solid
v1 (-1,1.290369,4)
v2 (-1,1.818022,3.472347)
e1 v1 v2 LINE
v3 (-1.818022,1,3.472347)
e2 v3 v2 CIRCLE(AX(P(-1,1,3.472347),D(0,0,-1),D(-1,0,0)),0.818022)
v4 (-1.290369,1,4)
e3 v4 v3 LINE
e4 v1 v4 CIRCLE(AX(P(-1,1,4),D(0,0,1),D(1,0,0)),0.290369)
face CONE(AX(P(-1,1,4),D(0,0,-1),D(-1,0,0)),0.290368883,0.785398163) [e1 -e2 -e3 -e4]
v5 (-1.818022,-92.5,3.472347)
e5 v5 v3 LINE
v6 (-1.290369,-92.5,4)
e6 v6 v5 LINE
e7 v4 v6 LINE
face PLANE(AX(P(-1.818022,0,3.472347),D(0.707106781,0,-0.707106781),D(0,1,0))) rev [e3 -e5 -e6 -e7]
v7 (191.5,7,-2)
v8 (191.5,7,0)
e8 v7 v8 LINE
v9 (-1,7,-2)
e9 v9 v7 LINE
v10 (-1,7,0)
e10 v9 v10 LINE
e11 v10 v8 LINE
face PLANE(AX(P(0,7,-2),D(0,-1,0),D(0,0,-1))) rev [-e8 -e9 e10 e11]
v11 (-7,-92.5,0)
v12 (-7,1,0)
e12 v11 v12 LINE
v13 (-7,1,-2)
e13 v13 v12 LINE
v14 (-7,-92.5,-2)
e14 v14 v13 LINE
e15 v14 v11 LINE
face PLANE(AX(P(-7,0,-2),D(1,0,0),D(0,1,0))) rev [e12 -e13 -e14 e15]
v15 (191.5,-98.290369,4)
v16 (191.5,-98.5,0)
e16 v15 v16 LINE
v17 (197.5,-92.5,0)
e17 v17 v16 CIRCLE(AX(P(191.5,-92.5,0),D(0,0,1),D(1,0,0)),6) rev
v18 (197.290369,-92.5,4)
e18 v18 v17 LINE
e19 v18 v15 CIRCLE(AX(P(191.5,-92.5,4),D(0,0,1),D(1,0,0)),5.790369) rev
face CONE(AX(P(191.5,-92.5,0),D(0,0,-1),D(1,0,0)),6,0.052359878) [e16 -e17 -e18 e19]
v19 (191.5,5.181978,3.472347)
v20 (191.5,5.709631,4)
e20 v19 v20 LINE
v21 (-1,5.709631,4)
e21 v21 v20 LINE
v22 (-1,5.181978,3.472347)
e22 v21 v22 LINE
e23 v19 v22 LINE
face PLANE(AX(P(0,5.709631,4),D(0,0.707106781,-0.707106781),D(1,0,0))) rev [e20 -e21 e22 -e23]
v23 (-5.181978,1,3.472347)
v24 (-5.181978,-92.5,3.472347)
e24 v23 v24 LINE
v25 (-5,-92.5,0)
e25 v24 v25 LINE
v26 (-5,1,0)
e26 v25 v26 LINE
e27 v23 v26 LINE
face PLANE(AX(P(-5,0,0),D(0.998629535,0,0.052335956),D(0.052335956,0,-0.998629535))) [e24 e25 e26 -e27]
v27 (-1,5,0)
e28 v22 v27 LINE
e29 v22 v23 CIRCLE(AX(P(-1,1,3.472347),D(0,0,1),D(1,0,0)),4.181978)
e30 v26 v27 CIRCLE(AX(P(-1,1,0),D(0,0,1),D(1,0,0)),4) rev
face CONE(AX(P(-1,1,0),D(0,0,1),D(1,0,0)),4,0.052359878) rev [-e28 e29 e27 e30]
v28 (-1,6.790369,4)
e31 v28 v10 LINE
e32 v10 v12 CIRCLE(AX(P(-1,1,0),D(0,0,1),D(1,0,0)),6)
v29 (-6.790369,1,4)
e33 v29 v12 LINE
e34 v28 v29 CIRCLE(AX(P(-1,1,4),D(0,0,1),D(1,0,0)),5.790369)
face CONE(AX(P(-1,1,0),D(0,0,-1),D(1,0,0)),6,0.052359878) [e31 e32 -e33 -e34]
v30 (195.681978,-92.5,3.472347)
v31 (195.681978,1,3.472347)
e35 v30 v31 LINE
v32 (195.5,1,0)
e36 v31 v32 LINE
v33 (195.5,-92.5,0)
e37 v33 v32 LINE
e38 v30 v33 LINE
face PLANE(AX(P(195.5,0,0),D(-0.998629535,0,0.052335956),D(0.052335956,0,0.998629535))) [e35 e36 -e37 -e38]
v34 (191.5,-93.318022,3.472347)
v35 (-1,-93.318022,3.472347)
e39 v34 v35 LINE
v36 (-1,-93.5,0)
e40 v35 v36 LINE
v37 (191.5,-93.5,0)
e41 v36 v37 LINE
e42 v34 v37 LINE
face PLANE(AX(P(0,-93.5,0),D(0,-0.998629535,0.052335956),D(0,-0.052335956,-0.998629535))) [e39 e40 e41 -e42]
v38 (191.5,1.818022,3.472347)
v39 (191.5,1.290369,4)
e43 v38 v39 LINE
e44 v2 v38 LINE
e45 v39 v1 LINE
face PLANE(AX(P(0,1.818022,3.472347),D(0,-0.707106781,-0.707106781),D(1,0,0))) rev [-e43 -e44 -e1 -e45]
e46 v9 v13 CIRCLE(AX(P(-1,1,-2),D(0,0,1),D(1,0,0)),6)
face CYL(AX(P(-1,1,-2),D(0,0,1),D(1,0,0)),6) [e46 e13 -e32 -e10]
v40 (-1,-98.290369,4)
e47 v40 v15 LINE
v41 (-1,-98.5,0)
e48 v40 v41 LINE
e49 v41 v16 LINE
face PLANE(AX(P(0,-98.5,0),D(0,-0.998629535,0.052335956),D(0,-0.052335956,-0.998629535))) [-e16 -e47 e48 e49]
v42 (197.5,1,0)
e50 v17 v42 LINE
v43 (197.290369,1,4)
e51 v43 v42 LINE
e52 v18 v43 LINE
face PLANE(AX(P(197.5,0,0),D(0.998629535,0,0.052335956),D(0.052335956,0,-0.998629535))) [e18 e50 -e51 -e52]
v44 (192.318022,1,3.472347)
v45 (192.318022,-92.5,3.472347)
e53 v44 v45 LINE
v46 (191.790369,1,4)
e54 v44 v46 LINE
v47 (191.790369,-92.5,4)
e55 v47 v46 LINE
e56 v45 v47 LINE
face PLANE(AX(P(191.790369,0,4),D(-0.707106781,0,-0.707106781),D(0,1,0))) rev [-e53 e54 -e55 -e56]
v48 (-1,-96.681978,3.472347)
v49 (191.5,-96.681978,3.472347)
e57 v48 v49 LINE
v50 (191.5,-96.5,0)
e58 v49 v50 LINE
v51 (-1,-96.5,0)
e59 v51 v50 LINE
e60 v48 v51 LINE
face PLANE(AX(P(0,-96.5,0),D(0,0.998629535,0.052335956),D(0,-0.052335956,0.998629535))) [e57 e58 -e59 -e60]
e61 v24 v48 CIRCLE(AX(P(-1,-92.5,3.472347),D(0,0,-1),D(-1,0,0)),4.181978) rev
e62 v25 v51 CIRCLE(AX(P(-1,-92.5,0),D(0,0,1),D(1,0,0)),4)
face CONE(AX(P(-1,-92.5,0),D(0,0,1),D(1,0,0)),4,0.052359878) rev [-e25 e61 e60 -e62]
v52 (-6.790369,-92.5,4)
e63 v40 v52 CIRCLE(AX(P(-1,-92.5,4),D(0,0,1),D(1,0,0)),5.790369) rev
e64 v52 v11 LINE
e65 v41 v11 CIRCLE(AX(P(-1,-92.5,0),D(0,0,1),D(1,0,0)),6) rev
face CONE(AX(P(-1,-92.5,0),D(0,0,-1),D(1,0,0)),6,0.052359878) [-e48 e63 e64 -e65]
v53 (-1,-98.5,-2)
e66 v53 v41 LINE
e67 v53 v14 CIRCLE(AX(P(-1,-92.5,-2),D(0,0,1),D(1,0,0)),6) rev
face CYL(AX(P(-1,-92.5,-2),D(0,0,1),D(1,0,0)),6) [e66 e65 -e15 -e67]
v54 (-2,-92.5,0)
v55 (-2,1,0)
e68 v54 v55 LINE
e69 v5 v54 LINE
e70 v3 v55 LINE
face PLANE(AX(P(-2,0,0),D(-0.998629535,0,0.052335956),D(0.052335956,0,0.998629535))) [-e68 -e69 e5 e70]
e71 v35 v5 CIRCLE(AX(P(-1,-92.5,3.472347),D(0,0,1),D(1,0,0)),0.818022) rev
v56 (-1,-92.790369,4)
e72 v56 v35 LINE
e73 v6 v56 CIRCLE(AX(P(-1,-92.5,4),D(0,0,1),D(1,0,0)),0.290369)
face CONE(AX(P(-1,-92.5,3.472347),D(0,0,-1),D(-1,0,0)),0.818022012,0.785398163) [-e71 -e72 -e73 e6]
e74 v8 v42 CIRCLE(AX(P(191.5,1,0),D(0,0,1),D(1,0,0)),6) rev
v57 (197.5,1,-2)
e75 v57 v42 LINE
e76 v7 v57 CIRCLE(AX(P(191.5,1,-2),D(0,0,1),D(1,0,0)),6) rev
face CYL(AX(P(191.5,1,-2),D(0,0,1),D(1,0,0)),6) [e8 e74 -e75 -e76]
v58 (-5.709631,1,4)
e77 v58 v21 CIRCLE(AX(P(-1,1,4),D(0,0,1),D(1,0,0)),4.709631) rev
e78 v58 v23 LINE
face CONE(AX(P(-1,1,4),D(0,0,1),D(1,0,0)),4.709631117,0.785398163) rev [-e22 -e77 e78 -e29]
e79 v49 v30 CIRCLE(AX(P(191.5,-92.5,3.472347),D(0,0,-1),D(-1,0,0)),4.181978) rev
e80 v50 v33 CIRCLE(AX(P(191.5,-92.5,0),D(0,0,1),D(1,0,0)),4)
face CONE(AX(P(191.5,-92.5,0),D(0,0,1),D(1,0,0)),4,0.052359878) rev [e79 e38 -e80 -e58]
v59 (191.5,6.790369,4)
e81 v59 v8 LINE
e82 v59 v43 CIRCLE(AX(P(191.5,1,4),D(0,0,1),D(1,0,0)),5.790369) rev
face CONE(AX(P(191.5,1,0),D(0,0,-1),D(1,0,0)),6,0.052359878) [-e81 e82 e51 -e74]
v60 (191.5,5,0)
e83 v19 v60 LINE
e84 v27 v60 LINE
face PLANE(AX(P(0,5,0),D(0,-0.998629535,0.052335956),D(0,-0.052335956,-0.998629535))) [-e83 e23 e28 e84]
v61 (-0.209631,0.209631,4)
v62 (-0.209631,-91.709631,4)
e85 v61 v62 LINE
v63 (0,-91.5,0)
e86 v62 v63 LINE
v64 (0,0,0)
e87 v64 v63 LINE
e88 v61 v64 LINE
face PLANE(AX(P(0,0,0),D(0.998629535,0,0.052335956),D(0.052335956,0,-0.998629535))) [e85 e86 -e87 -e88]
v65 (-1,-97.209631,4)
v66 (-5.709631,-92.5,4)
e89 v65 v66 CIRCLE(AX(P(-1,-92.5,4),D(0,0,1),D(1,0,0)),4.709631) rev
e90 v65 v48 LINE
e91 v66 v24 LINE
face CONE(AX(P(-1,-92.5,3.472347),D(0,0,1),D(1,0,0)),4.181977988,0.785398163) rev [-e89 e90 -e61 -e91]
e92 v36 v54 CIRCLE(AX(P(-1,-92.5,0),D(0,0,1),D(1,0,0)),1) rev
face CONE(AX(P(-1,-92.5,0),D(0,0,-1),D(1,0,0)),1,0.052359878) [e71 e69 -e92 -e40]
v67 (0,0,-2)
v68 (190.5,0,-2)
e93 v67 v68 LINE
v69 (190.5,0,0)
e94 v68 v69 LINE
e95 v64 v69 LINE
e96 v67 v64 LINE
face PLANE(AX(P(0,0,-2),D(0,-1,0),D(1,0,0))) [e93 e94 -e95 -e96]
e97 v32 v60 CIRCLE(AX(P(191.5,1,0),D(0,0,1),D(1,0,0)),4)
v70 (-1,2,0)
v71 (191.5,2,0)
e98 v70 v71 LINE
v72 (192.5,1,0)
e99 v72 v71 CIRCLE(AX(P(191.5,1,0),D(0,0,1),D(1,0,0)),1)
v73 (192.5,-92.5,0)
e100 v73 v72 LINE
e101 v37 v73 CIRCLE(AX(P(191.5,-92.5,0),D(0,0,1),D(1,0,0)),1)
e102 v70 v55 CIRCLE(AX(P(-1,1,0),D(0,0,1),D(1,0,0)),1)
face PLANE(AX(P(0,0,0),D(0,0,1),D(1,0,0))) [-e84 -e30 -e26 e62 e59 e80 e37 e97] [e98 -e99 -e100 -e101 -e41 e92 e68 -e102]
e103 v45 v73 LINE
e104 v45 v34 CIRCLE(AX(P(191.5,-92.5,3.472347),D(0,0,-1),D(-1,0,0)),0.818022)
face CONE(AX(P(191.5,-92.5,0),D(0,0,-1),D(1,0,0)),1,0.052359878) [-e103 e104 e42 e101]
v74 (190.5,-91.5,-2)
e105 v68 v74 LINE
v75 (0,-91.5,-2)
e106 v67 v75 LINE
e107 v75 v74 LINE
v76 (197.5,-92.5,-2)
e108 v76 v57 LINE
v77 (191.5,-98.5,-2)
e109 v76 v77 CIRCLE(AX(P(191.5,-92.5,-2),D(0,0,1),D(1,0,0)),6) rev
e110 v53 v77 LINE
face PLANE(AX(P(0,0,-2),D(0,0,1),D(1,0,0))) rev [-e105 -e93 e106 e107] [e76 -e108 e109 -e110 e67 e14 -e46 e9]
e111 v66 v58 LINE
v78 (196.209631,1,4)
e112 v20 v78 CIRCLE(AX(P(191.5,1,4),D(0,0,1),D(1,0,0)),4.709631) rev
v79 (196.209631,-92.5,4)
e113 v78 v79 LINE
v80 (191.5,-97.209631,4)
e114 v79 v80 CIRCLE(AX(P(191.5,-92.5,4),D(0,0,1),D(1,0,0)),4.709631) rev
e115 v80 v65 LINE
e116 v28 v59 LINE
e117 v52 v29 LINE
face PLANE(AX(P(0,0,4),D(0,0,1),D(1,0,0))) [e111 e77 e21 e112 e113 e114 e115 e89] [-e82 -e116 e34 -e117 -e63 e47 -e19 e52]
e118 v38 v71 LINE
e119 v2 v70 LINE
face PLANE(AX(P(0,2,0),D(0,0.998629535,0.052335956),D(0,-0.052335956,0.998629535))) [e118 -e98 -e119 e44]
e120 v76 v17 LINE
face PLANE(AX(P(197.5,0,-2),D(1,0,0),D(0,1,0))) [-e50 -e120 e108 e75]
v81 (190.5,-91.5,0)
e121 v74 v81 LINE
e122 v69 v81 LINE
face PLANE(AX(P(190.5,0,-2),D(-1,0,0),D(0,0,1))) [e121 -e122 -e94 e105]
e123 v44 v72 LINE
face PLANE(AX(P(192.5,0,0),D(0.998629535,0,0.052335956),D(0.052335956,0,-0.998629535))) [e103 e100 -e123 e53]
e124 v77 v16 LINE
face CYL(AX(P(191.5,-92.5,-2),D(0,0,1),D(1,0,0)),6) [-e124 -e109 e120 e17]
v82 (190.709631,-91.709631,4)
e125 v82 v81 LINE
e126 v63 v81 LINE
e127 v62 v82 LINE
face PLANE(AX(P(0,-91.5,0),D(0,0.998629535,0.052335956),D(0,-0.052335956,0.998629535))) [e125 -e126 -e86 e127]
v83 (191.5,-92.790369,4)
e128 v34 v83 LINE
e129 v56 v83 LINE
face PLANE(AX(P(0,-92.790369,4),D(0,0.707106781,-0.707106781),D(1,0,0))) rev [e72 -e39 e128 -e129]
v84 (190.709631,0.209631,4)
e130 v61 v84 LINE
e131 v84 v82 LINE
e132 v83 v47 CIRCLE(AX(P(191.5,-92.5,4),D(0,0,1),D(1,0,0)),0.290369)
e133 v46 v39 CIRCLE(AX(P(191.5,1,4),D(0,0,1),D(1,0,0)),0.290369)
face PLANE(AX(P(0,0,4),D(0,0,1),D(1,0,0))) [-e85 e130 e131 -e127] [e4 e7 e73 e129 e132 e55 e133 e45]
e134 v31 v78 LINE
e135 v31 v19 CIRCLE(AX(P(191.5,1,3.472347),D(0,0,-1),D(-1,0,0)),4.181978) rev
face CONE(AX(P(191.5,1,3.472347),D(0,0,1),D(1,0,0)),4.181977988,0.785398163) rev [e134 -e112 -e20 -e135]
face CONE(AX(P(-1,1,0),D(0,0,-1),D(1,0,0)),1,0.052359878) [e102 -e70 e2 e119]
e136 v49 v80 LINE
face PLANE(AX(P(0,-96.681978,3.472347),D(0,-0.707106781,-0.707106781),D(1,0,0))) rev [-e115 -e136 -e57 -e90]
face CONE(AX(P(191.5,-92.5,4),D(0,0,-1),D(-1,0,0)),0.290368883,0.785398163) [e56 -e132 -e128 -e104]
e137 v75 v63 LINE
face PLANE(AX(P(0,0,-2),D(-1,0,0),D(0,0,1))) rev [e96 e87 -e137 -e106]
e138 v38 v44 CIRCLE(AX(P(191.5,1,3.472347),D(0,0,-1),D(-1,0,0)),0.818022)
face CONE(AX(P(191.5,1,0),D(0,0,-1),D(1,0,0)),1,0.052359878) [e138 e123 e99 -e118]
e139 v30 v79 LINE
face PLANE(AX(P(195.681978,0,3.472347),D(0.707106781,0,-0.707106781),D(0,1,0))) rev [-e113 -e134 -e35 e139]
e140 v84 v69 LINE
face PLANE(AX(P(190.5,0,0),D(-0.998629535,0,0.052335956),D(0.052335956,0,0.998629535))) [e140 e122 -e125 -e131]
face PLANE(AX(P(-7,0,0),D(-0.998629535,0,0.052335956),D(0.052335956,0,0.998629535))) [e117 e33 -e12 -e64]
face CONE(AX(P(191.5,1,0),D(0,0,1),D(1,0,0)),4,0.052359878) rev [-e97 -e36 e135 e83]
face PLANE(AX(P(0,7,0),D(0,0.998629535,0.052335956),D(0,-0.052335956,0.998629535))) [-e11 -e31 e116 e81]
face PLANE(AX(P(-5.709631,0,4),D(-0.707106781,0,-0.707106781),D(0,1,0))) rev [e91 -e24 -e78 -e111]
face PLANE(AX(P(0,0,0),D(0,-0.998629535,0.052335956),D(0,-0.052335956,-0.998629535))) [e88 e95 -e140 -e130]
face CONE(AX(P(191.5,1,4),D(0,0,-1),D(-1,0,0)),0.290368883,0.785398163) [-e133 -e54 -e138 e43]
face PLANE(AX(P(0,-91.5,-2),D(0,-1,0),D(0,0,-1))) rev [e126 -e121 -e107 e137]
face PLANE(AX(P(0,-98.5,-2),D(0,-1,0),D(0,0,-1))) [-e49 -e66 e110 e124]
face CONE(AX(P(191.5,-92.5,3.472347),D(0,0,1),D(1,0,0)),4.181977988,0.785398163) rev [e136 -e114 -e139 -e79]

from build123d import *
from OCP.BRepFilletAPI import BRepFilletAPI_MakeChamfer

# Parameters (mm, degrees)
BOSS_EXTRU_1_DEPTH           = 4
BOSS_EXTRU_1_DRAFT           = 3
ESQUISSE1_W                  = 190.5
ESQUISSE1_H                  = 91.5
BOSS_EXTRU_1_PROFILE_2_DEPTH = 4
BOSS_EXTRU_1_PROFILE_2_DRAFT = 3
ESQUISSE1_4_W                = 190.5
ESQUISSE1_4_H                = 91.5
BOSS_EXTRU_2_DEPTH           = 2
CHANFREIN1_SIZE              = 0.528377251
CHANFREIN1_SIZE_2            = 0.5
CHANFREIN2_SIZE              = 0.528377251
CHANFREIN2_SIZE_2            = 0.5


with BuildPart() as part:
    # Esquisse1 → Boss.-Extru.1 (with draft: the straight prism first)
    with BuildSketch(Plane.XY):
        with BuildLine():
            Line((-1, -98.5), (191.5, -98.5))
            ThreePointArc((191.5, -98.5), (195.742640687, -96.742640687), (197.5, -92.5))
            Line((197.5, -92.5), (197.5, 1))
            ThreePointArc((197.5, 1), (195.742640687, 5.242640687), (191.5, 7))
            Line((191.5, 7), (-1, 7))
            ThreePointArc((-1, 7), (-5.242640687, 5.242640687), (-7, 1))
            Line((-7, 1), (-7, -92.5))
            ThreePointArc((-7, -92.5), (-5.242640687, -96.742640687), (-1, -98.5))
        make_face()
        with BuildLine():
            Line((-1, -96.5), (191.5, -96.5))
            ThreePointArc((191.5, -96.5), (194.328427125, -95.328427125), (195.5, -92.5))
            Line((195.5, -92.5), (195.5, 1))
            ThreePointArc((195.5, 1), (194.328427125, 3.828427125), (191.5, 5))
            Line((191.5, 5), (-1, 5))
            ThreePointArc((-1, 5), (-3.828427125, 3.828427125), (-5, 1))
            Line((-5, 1), (-5, -92.5))
            ThreePointArc((-5, -92.5), (-3.828427125, -95.328427125), (-1, -96.5))
        make_face(mode=Mode.SUBTRACT)
    extrude(amount=BOSS_EXTRU_1_DEPTH)
    # Boss.-Extru.1: the draft: its side faces are tilted about the plane it starts from
    boss_extru_1_sides = [part.faces().sort_by_distance(p)[0] for p in [
        (-5.242640687, -96.742640687, 2),
        (95.25, -98.5, 2),
        (195.742640687, -96.742640687, 2),
        (197.5, -45.75, 2),
        (195.742640687, 5.242640687, 2),
        (95.25, 7, 2),
        (-5.242640687, 5.242640687, 2),
        (-7, -45.75, 2),
        (-5, -45.75, 2),
        (-3.828427125, 3.828427125, 2),
        (95.25, 5, 2),
        (194.328427125, 3.828427125, 2),
        (195.5, -45.75, 2),
        (194.328427125, -95.328427125, 2),
        (95.25, -96.5, 2),
        (-3.828427125, -95.328427125, 2),
    ]]
    draft(boss_extru_1_sides, Plane.XY, BOSS_EXTRU_1_DRAFT)



with BuildPart() as body_2:
    # Esquisse1 → Boss.-Extru.1 profile 2 (with draft: the straight prism first)
    with BuildSketch(Plane.XY):
        with BuildLine():
            Line((-1, -93.5), (191.5, -93.5))
            ThreePointArc((191.5, -93.5), (192.207106781, -93.207106781), (192.5, -92.5))
            Line((192.5, -92.5), (192.5, 1))
            ThreePointArc((192.5, 1), (192.207106781, 1.707106781), (191.5, 2))
            Line((191.5, 2), (-1, 2))
            ThreePointArc((-1, 2), (-1.707106781, 1.707106781), (-2, 1))
            Line((-2, 1), (-2, -92.5))
            ThreePointArc((-2, -92.5), (-1.707106781, -93.207106781), (-1, -93.5))
        make_face()
        with Locations((95.25, -45.75)):
            Rectangle(ESQUISSE1_W, ESQUISSE1_H, mode=Mode.SUBTRACT)
    extrude(amount=BOSS_EXTRU_1_PROFILE_2_DEPTH)
    # Boss.-Extru.1 profile 2: the draft: its side faces are tilted about the plane it starts from
    boss_extru_1_profile_2_sides = [body_2.faces().sort_by_distance(p)[0] for p in [
        (-1.707106781, -93.207106781, 2),
        (95.25, -93.5, 2),
        (192.207106781, -93.207106781, 2),
        (192.5, -45.75, 2),
        (192.207106781, 1.707106781, 2),
        (95.25, 2, 2),
        (-1.707106781, 1.707106781, 2),
        (-2, -45.75, 2),
        (95.25, 0, 2),
        (190.5, -45.75, 2),
        (95.25, -91.5, 2),
        (0, -45.75, 2),
    ]]
    draft(boss_extru_1_profile_2_sides, Plane.XY, BOSS_EXTRU_1_PROFILE_2_DRAFT)


with BuildPart() as part_1:
    add(part.part)

    add(body_2.part)  # Boss.-Extru.2 merges body 2
    # Esquisse1<4> → Boss.-Extru.2 (add)
    with BuildSketch(Plane.XY):
        with BuildLine():
            Line((-1, -98.5), (191.5, -98.5))
            ThreePointArc((191.5, -98.5), (195.742640687, -96.742640687), (197.5, -92.5))
            Line((197.5, -92.5), (197.5, 1))
            ThreePointArc((197.5, 1), (195.742640687, 5.242640687), (191.5, 7))
            Line((191.5, 7), (-1, 7))
            ThreePointArc((-1, 7), (-5.242640687, 5.242640687), (-7, 1))
            Line((-7, 1), (-7, -92.5))
            ThreePointArc((-7, -92.5), (-5.242640687, -96.742640687), (-1, -98.5))
        make_face()
        with Locations((95.25, -45.75)):
            Rectangle(ESQUISSE1_4_W, ESQUISSE1_4_H, mode=Mode.SUBTRACT)
    extrude(amount=-BOSS_EXTRU_2_DEPTH)

    # Chanfrein1
    chanfrein1_edges_1 = [part_1.edges().sort_by_distance(p)[0] for p in [
        (-1.558875197, -93.058875197, 4),
    ]]
    chanfrein1_side_1 = [part_1.faces().sort_by_distance(p)[0] for p in [
        (-1.559245268, -93.059245268, 3.990013705),
    ]]
    chanfrein1_edges_2 = [part_1.edges().sort_by_distance(p)[0] for p in [
        (-1.790368883, -45.75, 4),
    ]]
    chanfrein1_side_2 = [part_1.faces().sort_by_distance(p)[0] for p in [
        (-1.790892242, -45.75, 3.990013705),
    ]]
    chanfrein1_edges_3 = [part_1.edges().sort_by_distance(p)[0] for p in [
        (95.25, -93.290368883, 4),
    ]]
    chanfrein1_side_3 = [part_1.faces().sort_by_distance(p)[0] for p in [
        (95.25, -93.290892242, 3.990013705),
    ]]
    chanfrein1_edges_4 = [part_1.edges().sort_by_distance(p)[0] for p in [
        (192.058875197, -93.058875197, 4),
    ]]
    chanfrein1_side_4 = [part_1.faces().sort_by_distance(p)[0] for p in [
        (192.051804129, -93.051804129, 4),
    ]]
    chanfrein1_edges_5 = [part_1.edges().sort_by_distance(p)[0] for p in [
        (192.290368883, -45.75, 4),
    ]]
    chanfrein1_side_5 = [part_1.faces().sort_by_distance(p)[0] for p in [
        (192.280368883, -45.75, 4),
    ]]
    chanfrein1_edges_6 = [part_1.edges().sort_by_distance(p)[0] for p in [
        (192.058875197, 1.558875197, 4),
    ]]
    chanfrein1_side_6 = [part_1.faces().sort_by_distance(p)[0] for p in [
        (192.051804129, 1.551804129, 4),
    ]]
    chanfrein1_edges_7 = [part_1.edges().sort_by_distance(p)[0] for p in [
        (95.25, 1.790368883, 4),
    ]]
    chanfrein1_side_7 = [part_1.faces().sort_by_distance(p)[0] for p in [
        (95.25, 1.780368883, 4),
    ]]
    chanfrein1_edges_8 = [part_1.edges().sort_by_distance(p)[0] for p in [
        (-1.558875197, 1.558875197, 4),
    ]]
    chanfrein1_side_8 = [part_1.faces().sort_by_distance(p)[0] for p in [
        (-1.551804129, 1.551804129, 4),
    ]]
    chanfrein1 = BRepFilletAPI_MakeChamfer(part_1.part.solid().wrapped)
    for e in chanfrein1_edges_1:
        chanfrein1.Add(CHANFREIN1_SIZE, CHANFREIN1_SIZE_2, e.wrapped, chanfrein1_side_1[0].wrapped)
    for e in chanfrein1_edges_2:
        chanfrein1.Add(CHANFREIN1_SIZE, CHANFREIN1_SIZE_2, e.wrapped, chanfrein1_side_2[0].wrapped)
    for e in chanfrein1_edges_3:
        chanfrein1.Add(CHANFREIN1_SIZE, CHANFREIN1_SIZE_2, e.wrapped, chanfrein1_side_3[0].wrapped)
    for e in chanfrein1_edges_4:
        chanfrein1.Add(CHANFREIN1_SIZE_2, CHANFREIN1_SIZE, e.wrapped, chanfrein1_side_4[0].wrapped)
    for e in chanfrein1_edges_5:
        chanfrein1.Add(CHANFREIN1_SIZE_2, CHANFREIN1_SIZE, e.wrapped, chanfrein1_side_5[0].wrapped)
    for e in chanfrein1_edges_6:
        chanfrein1.Add(CHANFREIN1_SIZE_2, CHANFREIN1_SIZE, e.wrapped, chanfrein1_side_6[0].wrapped)
    for e in chanfrein1_edges_7:
        chanfrein1.Add(CHANFREIN1_SIZE, CHANFREIN1_SIZE_2, e.wrapped, chanfrein1_side_7[0].wrapped)
    for e in chanfrein1_edges_8:
        chanfrein1.Add(CHANFREIN1_SIZE_2, CHANFREIN1_SIZE, e.wrapped, chanfrein1_side_8[0].wrapped)
    add(Compound.cast(chanfrein1.Shape()), mode=Mode.REPLACE)

    # Chanfrein2
    chanfrein2_edges_1 = [part_1.edges().sort_by_distance(p)[0] for p in [
        (-3.976658709, 3.976658709, 4),
    ]]
    chanfrein2_side_1 = [part_1.faces().sort_by_distance(p)[0] for p in [
        (-3.976288638, 3.976288638, 3.990013705),
    ]]
    chanfrein2_edges_2 = [part_1.edges().sort_by_distance(p)[0] for p in [
        (95.25, 5.209631117, 4),
    ]]
    chanfrein2_side_2 = [part_1.faces().sort_by_distance(p)[0] for p in [
        (95.25, 5.209107758, 3.990013705),
    ]]
    chanfrein2_edges_3 = [part_1.edges().sort_by_distance(p)[0] for p in [
        (-5.209631117, -45.75, 4),
    ]]
    chanfrein2_side_3 = [part_1.faces().sort_by_distance(p)[0] for p in [
        (-5.209107758, -45.75, 3.990013705),
    ]]
    chanfrein2_edges_4 = [part_1.edges().sort_by_distance(p)[0] for p in [
        (194.476658709, 3.976658709, 4),
    ]]
    chanfrein2_side_4 = [part_1.faces().sort_by_distance(p)[0] for p in [
        (194.476288638, 3.976288638, 3.990013705),
    ]]
    chanfrein2_edges_5 = [part_1.edges().sort_by_distance(p)[0] for p in [
        (-3.976658709, -95.476658709, 4),
    ]]
    chanfrein2_side_5 = [part_1.faces().sort_by_distance(p)[0] for p in [
        (-3.976288638, -95.476288638, 3.990013705),
    ]]
    chanfrein2_edges_6 = [part_1.edges().sort_by_distance(p)[0] for p in [
        (195.709631117, -45.75, 4),
    ]]
    chanfrein2_side_6 = [part_1.faces().sort_by_distance(p)[0] for p in [
        (195.709107758, -45.75, 3.990013705),
    ]]
    chanfrein2_edges_7 = [part_1.edges().sort_by_distance(p)[0] for p in [
        (95.25, -96.709631117, 4),
    ]]
    chanfrein2_side_7 = [part_1.faces().sort_by_distance(p)[0] for p in [
        (95.25, -96.709107758, 3.990013705),
    ]]
    chanfrein2_edges_8 = [part_1.edges().sort_by_distance(p)[0] for p in [
        (194.476658709, -95.476658709, 4),
    ]]
    chanfrein2_side_8 = [part_1.faces().sort_by_distance(p)[0] for p in [
        (194.476288638, -95.476288638, 3.990013705),
    ]]
    chanfrein2 = BRepFilletAPI_MakeChamfer(part_1.part.solid().wrapped)
    for e in chanfrein2_edges_1:
        chanfrein2.Add(CHANFREIN2_SIZE, CHANFREIN2_SIZE_2, e.wrapped, chanfrein2_side_1[0].wrapped)
    for e in chanfrein2_edges_2:
        chanfrein2.Add(CHANFREIN2_SIZE, CHANFREIN2_SIZE_2, e.wrapped, chanfrein2_side_2[0].wrapped)
    for e in chanfrein2_edges_3:
        chanfrein2.Add(CHANFREIN2_SIZE, CHANFREIN2_SIZE_2, e.wrapped, chanfrein2_side_3[0].wrapped)
    for e in chanfrein2_edges_4:
        chanfrein2.Add(CHANFREIN2_SIZE_2, CHANFREIN2_SIZE, e.wrapped, chanfrein2_side_4[0].wrapped)
    for e in chanfrein2_edges_5:
        chanfrein2.Add(CHANFREIN2_SIZE, CHANFREIN2_SIZE_2, e.wrapped, chanfrein2_side_5[0].wrapped)
    for e in chanfrein2_edges_6:
        chanfrein2.Add(CHANFREIN2_SIZE, CHANFREIN2_SIZE_2, e.wrapped, chanfrein2_side_6[0].wrapped)
    for e in chanfrein2_edges_7:
        chanfrein2.Add(CHANFREIN2_SIZE, CHANFREIN2_SIZE_2, e.wrapped, chanfrein2_side_7[0].wrapped)
    for e in chanfrein2_edges_8:
        chanfrein2.Add(CHANFREIN2_SIZE, CHANFREIN2_SIZE_2, e.wrapped, chanfrein2_side_8[0].wrapped)
    add(Compound.cast(chanfrein2.Shape()), mode=Mode.REPLACE)


solid = part_1.part
